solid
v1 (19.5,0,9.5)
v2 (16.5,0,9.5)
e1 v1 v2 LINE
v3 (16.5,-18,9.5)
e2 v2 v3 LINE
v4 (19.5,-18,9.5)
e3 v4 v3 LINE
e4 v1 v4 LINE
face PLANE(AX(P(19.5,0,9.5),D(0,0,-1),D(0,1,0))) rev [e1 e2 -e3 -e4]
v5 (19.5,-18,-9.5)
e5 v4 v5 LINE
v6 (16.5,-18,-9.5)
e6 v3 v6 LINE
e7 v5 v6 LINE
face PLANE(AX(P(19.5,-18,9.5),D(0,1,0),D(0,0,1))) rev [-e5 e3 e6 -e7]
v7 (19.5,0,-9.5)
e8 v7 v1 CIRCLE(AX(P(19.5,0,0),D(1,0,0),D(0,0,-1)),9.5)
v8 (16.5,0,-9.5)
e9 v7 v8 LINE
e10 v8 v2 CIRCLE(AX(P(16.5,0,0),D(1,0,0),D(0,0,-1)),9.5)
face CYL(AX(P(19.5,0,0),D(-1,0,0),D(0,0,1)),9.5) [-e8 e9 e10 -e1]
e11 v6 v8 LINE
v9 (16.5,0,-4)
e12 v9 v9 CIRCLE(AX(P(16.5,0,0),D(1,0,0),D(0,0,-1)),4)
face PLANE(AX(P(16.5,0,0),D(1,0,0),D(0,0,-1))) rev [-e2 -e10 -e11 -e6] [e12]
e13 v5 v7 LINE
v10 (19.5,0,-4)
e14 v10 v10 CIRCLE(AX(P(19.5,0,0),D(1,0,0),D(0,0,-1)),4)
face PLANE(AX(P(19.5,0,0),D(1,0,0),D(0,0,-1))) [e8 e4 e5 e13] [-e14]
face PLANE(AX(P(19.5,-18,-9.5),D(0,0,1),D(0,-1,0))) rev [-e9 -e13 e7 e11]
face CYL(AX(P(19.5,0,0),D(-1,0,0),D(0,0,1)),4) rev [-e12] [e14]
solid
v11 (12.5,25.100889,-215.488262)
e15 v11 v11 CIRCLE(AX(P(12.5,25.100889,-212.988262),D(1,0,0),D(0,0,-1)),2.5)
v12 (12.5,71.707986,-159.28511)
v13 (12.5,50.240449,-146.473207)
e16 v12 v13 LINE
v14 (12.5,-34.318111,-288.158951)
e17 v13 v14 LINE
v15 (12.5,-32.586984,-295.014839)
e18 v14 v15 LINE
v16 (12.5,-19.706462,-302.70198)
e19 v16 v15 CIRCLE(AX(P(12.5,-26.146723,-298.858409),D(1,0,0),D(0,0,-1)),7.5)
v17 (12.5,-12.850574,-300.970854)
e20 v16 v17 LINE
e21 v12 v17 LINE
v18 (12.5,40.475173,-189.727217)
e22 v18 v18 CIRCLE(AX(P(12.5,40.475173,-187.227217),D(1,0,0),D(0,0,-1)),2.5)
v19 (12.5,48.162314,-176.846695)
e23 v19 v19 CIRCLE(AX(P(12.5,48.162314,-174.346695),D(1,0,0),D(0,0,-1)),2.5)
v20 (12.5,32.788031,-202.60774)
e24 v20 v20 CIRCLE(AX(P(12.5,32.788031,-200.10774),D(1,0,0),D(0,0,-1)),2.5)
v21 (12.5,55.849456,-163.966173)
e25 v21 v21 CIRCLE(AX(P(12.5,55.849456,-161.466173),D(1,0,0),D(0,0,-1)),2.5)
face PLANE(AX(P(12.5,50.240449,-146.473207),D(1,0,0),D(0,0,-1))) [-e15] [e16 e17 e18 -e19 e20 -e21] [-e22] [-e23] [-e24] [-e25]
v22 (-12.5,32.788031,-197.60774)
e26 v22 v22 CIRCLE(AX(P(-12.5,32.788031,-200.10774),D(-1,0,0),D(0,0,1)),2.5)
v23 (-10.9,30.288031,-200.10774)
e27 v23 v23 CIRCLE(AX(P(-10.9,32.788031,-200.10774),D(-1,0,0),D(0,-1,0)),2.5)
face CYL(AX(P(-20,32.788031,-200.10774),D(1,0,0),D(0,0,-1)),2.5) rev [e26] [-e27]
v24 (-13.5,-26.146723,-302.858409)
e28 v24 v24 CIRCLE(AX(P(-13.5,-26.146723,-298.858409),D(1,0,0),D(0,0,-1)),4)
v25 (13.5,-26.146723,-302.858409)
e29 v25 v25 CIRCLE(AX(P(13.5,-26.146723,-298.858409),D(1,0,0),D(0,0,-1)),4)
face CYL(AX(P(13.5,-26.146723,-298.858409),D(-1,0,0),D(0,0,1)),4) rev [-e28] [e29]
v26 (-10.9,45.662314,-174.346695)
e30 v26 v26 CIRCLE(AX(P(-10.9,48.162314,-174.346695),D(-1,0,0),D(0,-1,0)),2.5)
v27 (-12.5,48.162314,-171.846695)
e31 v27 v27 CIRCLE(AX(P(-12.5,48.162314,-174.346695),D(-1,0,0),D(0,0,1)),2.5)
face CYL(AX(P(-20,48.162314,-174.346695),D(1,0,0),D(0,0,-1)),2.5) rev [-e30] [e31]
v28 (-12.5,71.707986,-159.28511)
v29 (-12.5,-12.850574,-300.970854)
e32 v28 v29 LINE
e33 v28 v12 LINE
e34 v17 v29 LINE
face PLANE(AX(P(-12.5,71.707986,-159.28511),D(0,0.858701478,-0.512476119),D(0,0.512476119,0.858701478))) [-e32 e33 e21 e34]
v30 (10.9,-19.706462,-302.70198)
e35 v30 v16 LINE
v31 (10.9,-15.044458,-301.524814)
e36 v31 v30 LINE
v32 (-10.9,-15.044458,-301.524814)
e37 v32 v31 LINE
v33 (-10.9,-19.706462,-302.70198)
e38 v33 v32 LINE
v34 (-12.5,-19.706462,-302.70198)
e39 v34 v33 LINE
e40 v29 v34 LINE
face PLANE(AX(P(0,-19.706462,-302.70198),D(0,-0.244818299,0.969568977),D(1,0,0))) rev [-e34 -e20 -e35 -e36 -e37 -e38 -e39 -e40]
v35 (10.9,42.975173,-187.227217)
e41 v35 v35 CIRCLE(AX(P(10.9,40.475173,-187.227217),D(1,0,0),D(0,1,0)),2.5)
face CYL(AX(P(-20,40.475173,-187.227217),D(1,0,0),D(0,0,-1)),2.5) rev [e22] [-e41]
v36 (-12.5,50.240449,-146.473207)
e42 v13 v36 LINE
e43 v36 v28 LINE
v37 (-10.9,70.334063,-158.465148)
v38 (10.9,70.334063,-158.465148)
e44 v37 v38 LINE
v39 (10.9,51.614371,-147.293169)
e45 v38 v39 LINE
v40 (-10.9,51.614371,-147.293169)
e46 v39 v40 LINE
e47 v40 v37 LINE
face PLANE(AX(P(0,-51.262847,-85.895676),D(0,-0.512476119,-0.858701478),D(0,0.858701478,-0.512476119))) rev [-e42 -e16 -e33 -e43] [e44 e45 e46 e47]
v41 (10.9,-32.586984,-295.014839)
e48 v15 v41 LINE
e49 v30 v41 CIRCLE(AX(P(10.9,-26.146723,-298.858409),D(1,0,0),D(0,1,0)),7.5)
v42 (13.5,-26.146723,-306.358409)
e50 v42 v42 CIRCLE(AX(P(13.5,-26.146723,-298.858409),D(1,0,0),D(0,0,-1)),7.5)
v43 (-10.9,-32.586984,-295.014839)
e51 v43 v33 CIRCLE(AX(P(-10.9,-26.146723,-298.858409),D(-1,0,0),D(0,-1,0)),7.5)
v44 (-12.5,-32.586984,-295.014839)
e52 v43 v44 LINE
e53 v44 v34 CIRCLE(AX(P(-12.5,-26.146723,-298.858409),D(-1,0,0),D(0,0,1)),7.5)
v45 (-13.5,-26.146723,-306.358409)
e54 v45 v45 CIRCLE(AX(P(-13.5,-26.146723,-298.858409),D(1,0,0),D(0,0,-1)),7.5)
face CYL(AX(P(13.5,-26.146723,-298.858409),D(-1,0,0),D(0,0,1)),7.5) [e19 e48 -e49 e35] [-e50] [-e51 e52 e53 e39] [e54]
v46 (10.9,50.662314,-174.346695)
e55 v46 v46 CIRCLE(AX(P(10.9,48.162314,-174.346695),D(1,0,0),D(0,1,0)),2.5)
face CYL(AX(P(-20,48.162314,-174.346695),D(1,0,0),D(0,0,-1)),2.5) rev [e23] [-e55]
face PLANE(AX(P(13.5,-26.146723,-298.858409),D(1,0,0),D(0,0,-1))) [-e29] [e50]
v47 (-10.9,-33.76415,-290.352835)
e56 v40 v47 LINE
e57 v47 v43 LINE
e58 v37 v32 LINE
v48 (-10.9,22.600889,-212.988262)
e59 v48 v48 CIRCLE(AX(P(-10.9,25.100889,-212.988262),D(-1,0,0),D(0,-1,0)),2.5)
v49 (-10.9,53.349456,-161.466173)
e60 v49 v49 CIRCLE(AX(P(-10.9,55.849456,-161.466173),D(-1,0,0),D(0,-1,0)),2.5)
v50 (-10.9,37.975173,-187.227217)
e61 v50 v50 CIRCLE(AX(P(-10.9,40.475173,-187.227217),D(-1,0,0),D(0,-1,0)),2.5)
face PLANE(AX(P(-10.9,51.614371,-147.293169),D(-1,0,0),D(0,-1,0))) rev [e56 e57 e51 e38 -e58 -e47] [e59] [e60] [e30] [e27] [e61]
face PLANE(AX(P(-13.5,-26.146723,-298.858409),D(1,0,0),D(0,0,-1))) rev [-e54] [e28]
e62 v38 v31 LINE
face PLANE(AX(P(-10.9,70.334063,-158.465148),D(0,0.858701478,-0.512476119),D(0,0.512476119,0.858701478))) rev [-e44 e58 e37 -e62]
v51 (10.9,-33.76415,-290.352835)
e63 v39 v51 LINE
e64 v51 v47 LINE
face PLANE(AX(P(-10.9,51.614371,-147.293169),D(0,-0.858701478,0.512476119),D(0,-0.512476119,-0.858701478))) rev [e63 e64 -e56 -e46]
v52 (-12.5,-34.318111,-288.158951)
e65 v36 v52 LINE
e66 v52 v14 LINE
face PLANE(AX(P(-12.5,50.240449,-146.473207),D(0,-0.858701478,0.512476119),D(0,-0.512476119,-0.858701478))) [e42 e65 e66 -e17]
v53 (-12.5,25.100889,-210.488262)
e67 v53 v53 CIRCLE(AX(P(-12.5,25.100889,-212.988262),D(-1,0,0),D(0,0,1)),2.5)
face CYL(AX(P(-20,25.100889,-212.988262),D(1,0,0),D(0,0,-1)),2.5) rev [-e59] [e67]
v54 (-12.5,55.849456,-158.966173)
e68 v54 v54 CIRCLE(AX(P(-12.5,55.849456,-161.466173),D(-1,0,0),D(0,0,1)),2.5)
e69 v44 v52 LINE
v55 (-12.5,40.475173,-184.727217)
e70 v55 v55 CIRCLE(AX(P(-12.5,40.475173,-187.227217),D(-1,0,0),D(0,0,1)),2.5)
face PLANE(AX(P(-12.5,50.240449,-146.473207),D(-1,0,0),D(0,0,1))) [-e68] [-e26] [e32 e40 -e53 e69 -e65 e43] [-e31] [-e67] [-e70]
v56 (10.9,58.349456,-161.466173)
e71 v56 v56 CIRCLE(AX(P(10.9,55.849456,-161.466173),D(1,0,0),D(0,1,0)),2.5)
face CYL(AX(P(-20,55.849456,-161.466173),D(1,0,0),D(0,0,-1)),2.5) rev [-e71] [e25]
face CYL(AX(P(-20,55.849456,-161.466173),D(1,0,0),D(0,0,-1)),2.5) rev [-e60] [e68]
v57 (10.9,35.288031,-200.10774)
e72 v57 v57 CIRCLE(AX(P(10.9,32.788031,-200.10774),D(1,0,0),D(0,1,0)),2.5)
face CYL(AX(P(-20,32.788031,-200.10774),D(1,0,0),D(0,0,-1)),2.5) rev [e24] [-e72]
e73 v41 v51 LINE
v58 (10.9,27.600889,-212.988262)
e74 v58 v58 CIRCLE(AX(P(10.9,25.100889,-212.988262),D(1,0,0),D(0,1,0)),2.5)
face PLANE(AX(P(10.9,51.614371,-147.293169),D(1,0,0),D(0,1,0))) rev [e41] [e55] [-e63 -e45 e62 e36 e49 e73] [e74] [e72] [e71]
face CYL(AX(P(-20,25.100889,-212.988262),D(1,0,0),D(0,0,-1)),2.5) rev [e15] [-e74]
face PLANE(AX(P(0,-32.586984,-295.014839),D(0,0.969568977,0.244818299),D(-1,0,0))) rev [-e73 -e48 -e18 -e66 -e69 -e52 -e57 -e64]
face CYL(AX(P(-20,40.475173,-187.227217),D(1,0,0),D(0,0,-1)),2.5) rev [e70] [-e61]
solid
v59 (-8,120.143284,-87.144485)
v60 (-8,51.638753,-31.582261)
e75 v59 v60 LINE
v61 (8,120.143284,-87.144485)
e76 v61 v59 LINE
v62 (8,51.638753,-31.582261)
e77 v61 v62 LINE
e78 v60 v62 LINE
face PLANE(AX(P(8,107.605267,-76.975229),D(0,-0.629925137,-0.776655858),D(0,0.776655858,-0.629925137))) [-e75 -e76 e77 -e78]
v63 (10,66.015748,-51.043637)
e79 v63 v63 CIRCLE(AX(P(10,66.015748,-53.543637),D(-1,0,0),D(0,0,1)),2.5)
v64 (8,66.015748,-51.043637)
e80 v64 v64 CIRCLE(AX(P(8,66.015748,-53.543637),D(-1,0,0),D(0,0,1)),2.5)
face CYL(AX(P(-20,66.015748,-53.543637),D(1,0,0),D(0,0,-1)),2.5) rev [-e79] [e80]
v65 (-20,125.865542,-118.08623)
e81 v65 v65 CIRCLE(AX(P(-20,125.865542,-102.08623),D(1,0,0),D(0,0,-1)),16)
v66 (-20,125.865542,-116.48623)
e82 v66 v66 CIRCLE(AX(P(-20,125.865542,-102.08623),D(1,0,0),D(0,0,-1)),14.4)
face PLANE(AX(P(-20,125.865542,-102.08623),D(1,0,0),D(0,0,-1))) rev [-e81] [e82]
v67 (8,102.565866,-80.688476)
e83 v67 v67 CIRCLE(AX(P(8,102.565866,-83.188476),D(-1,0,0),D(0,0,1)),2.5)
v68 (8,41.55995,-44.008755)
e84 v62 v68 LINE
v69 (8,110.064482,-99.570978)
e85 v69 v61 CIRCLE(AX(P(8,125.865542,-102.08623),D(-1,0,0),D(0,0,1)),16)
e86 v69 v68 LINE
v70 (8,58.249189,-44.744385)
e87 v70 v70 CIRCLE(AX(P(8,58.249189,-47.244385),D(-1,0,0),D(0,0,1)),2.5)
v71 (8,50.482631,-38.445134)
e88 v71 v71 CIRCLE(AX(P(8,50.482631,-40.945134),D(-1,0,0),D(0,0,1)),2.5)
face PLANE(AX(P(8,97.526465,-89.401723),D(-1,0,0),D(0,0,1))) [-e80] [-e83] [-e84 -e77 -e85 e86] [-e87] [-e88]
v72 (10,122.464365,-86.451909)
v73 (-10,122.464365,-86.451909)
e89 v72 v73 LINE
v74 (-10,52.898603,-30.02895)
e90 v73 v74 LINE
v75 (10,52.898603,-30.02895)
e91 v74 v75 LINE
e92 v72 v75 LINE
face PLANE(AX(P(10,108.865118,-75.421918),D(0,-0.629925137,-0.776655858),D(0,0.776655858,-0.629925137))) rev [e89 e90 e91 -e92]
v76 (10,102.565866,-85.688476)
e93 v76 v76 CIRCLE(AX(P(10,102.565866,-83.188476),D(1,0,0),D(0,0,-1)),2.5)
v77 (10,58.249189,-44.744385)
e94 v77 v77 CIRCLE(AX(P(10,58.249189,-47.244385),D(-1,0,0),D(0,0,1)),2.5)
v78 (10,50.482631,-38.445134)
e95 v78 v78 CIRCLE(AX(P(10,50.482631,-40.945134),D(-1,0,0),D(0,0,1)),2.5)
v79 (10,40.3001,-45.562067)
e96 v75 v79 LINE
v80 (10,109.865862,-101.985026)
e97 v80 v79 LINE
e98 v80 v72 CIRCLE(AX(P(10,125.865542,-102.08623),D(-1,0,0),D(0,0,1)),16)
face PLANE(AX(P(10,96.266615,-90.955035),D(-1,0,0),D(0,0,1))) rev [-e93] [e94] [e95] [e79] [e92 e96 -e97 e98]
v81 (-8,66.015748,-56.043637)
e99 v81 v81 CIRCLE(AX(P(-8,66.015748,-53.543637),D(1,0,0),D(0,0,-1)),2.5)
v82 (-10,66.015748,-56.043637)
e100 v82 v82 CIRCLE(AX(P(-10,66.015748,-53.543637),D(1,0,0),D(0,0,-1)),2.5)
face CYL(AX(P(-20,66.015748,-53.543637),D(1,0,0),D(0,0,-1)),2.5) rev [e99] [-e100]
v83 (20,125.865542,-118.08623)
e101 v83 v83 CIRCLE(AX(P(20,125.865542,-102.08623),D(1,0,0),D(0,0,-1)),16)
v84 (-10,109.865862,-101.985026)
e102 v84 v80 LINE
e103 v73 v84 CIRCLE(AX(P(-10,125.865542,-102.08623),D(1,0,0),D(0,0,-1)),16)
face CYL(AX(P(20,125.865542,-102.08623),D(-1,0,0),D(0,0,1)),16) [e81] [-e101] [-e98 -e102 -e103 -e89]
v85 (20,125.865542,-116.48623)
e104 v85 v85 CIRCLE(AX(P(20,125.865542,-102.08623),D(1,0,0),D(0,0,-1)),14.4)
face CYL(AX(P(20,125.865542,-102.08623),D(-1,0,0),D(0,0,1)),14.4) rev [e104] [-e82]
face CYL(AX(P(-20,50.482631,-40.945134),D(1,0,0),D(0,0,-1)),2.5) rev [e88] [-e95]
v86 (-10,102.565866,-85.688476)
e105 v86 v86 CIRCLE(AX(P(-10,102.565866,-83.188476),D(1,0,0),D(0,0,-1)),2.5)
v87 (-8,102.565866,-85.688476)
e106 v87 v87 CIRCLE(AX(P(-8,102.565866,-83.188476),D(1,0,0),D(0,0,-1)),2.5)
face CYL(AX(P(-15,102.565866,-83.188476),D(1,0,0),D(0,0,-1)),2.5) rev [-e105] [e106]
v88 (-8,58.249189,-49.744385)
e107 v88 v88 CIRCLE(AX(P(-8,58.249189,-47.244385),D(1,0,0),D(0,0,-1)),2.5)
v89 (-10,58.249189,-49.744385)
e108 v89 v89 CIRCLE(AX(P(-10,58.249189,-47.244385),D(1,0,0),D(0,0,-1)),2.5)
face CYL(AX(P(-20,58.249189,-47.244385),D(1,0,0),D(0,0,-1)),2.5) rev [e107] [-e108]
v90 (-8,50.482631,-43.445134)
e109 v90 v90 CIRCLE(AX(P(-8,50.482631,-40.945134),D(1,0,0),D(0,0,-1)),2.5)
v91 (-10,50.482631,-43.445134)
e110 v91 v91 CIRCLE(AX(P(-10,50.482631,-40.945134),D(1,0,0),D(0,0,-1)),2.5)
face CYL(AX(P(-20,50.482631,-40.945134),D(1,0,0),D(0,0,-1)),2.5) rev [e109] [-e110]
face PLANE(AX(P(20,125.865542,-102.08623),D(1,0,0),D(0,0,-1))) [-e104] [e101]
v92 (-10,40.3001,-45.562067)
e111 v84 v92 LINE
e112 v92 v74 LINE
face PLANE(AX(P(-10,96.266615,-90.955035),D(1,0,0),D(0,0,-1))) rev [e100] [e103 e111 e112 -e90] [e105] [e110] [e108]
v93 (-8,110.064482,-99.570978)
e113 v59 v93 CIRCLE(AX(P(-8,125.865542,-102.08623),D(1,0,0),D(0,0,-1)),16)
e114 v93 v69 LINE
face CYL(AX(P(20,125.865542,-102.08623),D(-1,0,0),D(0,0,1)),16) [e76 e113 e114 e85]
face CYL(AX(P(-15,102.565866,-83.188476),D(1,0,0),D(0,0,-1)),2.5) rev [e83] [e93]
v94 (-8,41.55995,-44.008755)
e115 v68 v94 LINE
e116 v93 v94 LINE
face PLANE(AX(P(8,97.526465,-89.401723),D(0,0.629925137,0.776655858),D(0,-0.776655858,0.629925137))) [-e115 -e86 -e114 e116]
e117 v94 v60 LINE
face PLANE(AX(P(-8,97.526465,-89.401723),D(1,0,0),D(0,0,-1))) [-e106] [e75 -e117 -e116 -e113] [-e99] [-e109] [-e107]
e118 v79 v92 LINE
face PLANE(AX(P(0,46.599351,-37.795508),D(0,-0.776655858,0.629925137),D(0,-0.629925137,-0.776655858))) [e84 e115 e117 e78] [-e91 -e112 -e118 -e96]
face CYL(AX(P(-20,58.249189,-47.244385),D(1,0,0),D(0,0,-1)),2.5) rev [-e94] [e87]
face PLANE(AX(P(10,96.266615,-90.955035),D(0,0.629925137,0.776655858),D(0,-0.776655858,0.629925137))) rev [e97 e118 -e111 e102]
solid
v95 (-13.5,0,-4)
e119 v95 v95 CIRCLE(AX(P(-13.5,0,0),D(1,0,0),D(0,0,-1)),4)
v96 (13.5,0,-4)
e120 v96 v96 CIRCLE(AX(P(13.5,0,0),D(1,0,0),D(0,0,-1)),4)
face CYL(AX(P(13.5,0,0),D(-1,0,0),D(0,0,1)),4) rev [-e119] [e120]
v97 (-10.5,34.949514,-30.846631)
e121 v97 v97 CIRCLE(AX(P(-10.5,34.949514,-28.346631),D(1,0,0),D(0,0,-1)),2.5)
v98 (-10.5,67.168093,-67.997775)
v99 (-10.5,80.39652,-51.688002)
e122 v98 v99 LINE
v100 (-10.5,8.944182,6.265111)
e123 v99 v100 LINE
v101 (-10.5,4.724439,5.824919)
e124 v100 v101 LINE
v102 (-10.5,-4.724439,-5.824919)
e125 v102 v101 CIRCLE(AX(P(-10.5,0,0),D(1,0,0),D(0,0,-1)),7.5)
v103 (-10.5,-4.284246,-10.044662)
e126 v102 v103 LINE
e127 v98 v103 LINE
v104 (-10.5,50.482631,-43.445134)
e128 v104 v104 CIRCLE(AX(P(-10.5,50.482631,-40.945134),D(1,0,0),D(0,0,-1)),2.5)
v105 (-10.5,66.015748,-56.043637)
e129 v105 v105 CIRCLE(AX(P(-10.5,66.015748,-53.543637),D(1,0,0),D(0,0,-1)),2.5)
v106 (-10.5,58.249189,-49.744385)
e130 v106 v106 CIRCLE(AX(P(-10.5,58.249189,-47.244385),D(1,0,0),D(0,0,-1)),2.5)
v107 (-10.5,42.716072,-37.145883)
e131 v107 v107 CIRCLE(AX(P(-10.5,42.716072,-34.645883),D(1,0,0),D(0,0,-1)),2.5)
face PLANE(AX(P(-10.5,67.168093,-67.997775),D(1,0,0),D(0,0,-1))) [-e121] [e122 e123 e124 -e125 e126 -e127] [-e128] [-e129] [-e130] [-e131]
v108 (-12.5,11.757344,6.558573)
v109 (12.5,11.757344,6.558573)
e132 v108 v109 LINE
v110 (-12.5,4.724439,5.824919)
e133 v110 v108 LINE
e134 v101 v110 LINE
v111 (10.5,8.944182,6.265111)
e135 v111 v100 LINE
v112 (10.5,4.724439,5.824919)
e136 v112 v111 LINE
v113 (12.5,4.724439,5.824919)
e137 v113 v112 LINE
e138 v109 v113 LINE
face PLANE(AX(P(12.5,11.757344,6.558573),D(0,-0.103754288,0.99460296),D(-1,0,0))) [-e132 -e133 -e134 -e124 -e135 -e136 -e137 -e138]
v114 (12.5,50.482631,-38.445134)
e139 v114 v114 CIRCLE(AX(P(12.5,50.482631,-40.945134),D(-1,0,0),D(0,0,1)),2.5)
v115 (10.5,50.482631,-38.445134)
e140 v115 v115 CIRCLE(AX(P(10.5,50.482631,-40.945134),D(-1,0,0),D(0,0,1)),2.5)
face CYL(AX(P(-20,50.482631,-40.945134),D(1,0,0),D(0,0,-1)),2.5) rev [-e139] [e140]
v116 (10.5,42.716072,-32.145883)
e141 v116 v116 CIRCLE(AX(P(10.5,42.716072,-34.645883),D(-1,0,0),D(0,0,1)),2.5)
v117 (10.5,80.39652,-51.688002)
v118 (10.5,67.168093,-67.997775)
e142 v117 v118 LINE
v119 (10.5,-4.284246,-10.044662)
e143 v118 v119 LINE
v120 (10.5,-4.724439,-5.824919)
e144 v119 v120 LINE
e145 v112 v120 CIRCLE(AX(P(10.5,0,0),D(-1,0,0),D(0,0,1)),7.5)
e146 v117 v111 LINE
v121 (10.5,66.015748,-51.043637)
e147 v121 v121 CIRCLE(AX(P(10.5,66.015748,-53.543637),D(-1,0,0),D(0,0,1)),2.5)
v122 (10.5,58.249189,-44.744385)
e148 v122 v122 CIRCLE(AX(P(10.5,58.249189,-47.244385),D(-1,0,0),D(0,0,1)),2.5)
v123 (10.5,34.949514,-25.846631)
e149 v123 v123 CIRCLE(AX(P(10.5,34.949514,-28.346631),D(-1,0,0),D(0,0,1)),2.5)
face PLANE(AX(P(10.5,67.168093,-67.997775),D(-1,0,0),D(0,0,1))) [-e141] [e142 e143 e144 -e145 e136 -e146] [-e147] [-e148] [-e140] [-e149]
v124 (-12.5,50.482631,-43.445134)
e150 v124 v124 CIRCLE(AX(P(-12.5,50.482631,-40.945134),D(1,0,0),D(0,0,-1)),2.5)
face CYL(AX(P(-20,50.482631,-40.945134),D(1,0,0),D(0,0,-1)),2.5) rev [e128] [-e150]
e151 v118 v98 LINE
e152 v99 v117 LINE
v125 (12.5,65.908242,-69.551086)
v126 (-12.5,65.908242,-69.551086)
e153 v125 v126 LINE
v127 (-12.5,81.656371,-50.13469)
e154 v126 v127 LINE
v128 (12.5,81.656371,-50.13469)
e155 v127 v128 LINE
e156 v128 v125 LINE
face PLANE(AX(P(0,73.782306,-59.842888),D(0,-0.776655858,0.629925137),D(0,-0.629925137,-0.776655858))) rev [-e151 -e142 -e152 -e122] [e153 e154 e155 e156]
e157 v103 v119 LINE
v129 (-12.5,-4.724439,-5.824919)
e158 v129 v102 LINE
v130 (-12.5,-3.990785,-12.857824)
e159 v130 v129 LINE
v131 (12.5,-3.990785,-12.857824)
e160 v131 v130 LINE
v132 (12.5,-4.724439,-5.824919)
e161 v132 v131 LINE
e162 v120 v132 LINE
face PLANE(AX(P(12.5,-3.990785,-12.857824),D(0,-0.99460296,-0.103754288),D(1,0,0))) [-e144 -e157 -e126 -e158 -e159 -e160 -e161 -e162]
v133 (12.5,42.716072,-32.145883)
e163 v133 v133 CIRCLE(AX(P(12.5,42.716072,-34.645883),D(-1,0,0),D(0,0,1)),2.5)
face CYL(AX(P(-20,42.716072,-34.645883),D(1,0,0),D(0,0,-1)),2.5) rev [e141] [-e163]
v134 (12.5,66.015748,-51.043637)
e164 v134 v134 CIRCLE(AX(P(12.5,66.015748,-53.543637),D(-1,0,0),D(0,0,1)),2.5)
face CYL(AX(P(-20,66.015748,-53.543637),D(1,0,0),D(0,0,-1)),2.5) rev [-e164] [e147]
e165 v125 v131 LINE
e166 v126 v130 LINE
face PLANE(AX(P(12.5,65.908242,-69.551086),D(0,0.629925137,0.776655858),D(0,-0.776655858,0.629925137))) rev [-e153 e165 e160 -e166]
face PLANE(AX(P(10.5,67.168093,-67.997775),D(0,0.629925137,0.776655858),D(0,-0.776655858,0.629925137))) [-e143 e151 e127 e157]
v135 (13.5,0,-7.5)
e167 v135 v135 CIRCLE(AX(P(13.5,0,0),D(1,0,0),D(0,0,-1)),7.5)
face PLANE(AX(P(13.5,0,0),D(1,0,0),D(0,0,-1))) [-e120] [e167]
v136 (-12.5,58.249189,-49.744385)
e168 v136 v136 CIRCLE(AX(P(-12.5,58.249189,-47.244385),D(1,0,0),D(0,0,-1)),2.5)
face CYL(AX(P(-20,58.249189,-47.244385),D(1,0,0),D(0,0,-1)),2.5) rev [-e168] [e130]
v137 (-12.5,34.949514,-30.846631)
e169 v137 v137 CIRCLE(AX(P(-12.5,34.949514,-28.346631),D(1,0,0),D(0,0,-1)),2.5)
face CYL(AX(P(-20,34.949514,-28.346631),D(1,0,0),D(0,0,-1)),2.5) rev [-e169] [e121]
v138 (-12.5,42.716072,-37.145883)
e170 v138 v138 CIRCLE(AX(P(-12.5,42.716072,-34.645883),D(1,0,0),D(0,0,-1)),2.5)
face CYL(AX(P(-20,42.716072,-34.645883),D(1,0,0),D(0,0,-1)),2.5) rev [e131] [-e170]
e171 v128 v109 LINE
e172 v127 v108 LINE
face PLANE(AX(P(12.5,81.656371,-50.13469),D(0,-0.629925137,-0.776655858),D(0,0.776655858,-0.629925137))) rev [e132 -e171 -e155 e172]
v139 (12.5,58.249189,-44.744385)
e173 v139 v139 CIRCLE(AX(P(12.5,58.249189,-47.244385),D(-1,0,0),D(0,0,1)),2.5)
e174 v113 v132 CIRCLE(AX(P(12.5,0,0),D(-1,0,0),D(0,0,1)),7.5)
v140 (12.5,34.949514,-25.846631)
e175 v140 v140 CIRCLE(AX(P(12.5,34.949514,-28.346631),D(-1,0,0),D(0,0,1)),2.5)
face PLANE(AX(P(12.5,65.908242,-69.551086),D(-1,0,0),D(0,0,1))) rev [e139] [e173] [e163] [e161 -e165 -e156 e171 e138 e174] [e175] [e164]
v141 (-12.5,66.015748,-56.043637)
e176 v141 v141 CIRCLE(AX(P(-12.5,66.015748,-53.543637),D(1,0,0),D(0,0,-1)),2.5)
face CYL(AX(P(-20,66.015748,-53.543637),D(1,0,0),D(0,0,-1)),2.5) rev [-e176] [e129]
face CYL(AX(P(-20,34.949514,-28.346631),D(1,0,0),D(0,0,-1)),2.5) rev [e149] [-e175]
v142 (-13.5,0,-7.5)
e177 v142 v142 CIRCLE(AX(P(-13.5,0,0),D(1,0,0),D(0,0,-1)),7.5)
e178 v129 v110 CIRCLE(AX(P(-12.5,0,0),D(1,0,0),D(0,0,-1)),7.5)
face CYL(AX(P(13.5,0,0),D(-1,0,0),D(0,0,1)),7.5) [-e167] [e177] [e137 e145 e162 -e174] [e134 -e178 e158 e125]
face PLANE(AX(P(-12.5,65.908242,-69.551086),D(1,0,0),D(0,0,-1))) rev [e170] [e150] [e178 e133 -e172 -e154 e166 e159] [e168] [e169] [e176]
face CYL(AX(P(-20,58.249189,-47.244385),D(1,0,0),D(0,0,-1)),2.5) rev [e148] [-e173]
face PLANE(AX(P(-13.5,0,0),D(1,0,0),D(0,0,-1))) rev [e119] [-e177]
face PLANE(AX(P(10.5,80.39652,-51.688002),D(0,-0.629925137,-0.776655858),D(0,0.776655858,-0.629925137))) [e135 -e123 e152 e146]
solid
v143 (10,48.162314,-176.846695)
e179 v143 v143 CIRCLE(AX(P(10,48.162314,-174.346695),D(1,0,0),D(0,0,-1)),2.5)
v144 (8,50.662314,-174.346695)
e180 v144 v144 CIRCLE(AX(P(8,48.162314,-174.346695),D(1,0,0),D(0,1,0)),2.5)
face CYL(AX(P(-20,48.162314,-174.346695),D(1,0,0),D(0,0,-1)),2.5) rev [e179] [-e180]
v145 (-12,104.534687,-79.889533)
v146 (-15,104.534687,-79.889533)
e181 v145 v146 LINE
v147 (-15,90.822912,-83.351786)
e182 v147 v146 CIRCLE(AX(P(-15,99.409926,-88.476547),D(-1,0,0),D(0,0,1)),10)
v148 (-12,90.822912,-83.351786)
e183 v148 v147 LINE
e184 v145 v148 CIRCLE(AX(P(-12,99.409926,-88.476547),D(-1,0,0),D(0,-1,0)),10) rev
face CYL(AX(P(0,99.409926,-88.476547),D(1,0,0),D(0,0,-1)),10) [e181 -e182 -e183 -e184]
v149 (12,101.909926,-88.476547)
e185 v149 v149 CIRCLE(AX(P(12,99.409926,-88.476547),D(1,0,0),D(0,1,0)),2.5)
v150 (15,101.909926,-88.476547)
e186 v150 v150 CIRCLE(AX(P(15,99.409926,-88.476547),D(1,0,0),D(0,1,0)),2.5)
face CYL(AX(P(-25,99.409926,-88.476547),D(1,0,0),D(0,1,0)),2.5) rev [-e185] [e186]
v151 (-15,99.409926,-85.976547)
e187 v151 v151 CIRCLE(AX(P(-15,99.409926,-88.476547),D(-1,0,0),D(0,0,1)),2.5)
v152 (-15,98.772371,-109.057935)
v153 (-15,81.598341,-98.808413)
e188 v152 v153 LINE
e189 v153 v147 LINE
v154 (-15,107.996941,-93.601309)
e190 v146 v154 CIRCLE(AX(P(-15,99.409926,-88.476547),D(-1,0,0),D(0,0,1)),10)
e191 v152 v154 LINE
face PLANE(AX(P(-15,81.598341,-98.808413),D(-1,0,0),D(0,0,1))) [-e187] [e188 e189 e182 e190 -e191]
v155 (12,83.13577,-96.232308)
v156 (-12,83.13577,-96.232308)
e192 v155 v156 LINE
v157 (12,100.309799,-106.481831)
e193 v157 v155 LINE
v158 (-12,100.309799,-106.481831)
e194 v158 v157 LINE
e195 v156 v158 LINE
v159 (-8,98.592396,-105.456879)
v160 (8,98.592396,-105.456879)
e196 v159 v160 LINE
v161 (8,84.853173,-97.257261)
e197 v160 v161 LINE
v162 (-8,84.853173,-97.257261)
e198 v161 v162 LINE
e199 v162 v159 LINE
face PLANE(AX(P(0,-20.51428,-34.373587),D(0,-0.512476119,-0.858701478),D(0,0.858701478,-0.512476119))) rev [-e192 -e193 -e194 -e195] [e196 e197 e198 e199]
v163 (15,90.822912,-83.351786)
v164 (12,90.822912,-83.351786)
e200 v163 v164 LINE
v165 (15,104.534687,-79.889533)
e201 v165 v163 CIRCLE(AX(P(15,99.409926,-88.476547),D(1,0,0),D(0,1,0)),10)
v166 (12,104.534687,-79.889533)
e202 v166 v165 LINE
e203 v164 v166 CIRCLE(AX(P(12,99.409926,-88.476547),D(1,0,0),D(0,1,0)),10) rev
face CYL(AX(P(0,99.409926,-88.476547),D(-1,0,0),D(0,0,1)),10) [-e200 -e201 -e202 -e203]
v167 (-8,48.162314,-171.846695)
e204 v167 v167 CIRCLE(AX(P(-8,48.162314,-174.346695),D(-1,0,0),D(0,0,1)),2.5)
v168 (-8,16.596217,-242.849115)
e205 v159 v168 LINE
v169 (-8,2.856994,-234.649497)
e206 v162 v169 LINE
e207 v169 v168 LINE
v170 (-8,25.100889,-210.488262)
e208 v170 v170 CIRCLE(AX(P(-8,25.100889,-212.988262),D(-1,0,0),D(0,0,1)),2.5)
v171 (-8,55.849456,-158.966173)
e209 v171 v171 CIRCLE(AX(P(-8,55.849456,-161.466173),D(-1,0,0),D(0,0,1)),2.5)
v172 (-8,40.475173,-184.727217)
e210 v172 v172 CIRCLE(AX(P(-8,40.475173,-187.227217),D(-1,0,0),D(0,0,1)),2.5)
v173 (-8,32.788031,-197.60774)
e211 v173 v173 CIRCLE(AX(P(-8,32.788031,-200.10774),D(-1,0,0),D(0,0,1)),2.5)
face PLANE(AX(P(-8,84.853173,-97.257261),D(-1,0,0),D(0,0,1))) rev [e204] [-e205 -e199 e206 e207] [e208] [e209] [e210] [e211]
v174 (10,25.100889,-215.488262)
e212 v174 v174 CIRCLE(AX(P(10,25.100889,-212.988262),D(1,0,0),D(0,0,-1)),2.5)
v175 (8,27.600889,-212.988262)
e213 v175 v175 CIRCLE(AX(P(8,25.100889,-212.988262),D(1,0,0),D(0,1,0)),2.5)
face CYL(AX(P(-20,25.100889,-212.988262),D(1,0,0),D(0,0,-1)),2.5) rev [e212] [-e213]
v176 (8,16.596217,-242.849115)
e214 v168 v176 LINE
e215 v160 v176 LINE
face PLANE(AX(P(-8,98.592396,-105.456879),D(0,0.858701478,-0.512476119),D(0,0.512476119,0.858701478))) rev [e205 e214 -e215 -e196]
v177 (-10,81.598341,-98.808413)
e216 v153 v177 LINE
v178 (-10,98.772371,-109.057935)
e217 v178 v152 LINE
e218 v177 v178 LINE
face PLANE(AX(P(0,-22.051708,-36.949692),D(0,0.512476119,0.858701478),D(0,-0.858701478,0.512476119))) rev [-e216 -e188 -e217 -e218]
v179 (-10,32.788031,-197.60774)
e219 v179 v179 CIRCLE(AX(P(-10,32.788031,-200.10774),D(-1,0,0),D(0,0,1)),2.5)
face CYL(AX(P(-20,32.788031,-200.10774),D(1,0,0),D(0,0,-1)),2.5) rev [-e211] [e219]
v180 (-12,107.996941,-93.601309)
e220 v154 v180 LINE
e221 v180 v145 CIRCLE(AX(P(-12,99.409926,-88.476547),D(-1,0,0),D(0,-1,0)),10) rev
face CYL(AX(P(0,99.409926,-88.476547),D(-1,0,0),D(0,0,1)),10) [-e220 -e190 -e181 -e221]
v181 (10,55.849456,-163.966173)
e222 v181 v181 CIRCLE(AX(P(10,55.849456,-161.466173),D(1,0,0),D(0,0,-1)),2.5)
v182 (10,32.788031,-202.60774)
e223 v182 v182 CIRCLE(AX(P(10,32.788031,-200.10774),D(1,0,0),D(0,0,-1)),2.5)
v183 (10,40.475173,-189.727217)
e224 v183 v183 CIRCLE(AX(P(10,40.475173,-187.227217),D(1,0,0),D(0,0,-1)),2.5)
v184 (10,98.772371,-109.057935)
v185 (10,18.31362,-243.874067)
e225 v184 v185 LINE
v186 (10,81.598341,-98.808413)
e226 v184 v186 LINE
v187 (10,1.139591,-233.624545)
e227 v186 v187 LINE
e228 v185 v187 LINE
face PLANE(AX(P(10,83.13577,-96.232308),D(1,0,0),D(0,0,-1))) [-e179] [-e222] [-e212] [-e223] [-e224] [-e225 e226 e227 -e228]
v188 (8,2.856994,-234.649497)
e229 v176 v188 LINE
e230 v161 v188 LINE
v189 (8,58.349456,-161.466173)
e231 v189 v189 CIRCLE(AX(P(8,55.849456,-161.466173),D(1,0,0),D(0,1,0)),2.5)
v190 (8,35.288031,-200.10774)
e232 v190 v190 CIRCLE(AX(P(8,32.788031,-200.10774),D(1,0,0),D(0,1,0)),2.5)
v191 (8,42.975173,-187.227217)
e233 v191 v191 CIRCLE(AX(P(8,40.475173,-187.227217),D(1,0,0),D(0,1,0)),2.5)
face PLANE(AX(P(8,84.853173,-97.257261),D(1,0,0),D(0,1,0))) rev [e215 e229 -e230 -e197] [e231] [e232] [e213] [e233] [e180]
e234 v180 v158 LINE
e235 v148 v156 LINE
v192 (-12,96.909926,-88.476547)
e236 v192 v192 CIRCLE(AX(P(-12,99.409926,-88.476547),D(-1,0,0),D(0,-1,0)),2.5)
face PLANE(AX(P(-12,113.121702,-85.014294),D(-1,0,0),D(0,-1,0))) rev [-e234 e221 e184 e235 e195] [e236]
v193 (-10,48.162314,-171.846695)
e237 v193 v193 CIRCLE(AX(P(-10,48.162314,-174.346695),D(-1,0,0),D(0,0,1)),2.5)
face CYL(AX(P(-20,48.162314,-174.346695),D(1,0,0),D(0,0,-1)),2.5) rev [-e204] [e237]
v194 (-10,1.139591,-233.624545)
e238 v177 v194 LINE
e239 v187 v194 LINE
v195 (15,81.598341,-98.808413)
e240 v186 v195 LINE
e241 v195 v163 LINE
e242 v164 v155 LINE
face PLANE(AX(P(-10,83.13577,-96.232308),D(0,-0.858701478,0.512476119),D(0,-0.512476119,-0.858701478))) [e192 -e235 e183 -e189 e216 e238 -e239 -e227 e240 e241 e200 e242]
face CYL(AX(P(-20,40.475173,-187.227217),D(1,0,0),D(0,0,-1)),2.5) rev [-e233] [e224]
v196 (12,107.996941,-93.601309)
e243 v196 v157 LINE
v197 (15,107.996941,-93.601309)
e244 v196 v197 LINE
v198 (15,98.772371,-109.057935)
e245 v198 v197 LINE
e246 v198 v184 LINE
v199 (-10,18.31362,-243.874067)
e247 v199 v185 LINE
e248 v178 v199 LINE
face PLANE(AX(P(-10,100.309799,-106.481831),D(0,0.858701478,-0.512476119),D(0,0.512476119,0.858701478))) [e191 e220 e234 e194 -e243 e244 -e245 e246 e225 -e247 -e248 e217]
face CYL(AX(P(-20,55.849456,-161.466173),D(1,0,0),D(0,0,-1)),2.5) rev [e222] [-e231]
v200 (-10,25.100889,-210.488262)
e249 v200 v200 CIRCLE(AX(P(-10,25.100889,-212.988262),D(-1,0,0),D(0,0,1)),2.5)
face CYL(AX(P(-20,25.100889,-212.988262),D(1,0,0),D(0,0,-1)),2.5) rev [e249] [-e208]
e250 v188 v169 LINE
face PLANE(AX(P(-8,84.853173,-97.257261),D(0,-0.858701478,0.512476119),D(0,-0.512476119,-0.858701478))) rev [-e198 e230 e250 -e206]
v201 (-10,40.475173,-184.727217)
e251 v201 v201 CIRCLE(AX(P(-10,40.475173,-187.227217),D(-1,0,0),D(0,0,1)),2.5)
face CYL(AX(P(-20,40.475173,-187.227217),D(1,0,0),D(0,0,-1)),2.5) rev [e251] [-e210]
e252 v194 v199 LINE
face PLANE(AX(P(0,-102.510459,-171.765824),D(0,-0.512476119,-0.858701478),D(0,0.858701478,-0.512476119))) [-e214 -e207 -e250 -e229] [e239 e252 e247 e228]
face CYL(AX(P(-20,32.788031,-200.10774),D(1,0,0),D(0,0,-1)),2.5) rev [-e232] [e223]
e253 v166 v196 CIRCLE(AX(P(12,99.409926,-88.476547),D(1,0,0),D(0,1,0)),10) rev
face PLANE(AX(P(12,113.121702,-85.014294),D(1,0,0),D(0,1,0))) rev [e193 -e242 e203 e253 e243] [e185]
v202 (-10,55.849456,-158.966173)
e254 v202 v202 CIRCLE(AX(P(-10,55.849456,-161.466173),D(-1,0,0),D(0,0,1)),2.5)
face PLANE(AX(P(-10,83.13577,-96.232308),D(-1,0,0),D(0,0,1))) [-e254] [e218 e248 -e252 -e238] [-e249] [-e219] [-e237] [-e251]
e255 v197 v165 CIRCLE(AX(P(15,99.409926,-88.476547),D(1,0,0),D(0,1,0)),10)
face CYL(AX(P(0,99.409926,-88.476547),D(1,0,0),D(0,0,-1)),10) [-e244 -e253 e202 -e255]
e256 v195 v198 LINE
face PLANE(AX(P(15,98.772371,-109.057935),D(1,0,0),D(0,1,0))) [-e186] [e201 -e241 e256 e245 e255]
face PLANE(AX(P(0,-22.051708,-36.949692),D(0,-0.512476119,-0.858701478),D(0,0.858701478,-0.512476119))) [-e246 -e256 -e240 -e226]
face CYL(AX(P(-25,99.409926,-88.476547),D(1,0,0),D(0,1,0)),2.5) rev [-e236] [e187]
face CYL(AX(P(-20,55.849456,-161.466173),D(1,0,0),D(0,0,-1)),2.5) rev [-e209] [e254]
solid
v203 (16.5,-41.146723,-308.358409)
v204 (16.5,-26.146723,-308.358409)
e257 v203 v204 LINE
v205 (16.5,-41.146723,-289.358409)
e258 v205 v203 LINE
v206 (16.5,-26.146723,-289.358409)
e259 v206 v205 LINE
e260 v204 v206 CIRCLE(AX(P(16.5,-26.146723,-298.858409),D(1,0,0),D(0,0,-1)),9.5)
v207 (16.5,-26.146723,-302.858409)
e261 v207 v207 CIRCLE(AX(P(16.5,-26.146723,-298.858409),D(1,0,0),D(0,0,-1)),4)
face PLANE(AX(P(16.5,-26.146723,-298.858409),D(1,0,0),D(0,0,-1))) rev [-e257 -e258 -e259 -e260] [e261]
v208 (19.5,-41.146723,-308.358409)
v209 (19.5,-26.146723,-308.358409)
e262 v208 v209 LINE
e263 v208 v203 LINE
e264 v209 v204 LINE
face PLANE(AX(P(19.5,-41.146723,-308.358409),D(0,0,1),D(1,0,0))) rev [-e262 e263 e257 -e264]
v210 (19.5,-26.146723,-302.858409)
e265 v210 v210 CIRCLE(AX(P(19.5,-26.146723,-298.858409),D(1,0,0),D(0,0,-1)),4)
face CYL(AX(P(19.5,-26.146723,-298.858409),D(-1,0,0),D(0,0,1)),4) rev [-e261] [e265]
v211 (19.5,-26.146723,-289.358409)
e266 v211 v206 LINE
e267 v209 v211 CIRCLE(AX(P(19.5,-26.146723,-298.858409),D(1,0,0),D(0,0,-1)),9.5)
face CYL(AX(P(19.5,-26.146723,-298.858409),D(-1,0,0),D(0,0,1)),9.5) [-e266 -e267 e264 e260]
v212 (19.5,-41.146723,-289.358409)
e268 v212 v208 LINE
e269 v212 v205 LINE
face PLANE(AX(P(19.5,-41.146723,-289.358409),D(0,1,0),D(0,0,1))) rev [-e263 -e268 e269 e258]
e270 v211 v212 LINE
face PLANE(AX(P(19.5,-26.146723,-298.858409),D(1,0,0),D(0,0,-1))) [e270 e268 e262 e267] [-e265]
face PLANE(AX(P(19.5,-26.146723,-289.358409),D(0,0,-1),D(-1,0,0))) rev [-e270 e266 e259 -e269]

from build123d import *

# Parameters (mm, degrees)
SKETCH4_W              = 25
SKETCH4_H              = 25
SKETCH4_W_2            = 21
SKETCH4_H_2            = 21
BOSS_EXTRUDE3_DEPTH    = 95
SKETCH9_W              = 25
SKETCH9_H              = 25
SKETCH9_W_2            = 21.8
SKETCH9_H_2            = 21.8
BOSS_EXTRUDE6_DEPTH    = 170
SKETCH7_R              = 7.5
CUT_EXTRUDE2_DEPTH     = 85
SKETCH2_R              = 7.5
SKETCH2_R_2            = 4
BOSS_EXTRUDE2_DEPTH    = 13.5
BOSS_EXTRUDE4_START    = 60
SKETCH5_W              = 20
SKETCH5_H              = 20
SKETCH5_W_2            = 16
SKETCH5_H_2            = 16
BOSS_EXTRUDE4_DEPTH    = 72.060893
BOSS_EXTRUDE7_START    = -70
SKETCH10_W             = 20
SKETCH10_H             = 20
SKETCH10_W_2           = 16
SKETCH10_H_2           = 16
BOSS_EXTRUDE7_DEPTH    = 160
SKETCH17_W             = 20
SKETCH17_H             = 20
SKETCH17_W_2           = 16
SKETCH17_H_2           = 16
BOSS_EXTRUDE11_DEPTH   = 30
SKETCH11_R             = 16
CUT_EXTRUDE3_DEPTH     = 12.5
SKETCH12_R             = 16
SKETCH12_R_2           = 14.4
BOSS_EXTRUDE8_DEPTH    = 20
CHAMFER1_SIZE          = 5
CHAMFER2_SIZE          = 5
SKETCH13_R             = 2.5
CUT_EXTRUDE4_DEPTH     = 20
SKETCH15_R             = 2.5
CUT_EXTRUDE5_DEPTH     = 20
LPATTERN1_COUNT        = 5
LPATTERN1_PITCH        = 10
LPATTERN2_COUNT        = 5
LPATTERN2_PITCH        = 15
BOSS_EXTRUDE10_START   = 18
SKETCH16_R             = 4
BOSS_EXTRUDE10_DEPTH   = 1.5
BOSS_EXTRUDE10_2_DEPTH = 1.5
SKETCH18_W             = 5
SKETCH18_H             = 20
BOSS_EXTRUDE12_DEPTH   = 3
SKETCH19_W             = 3
SKETCH19_H             = 20
BOSS_EXTRUDE13_DEPTH   = 25
FILLET1_R              = 10
SKETCH20_R             = 2.5
CUT_EXTRUDE6_DEPTH     = 25
SKETCH21_R             = 2.5
CUT_EXTRUDE7_DEPTH     = 40


# Some blends are built 0.0001 mm under size
with BuildPart() as part:
    # Sketch4 → Boss-Extrude3 (new body)
    with BuildSketch(Plane(origin=(0, 0, 0), x_dir=(-1, 0, 0), z_dir=(0, 0.776655857872885, -0.629925137164515))):
        Rectangle(SKETCH4_W, SKETCH4_H)
        Rectangle(SKETCH4_W_2, SKETCH4_H_2, mode=Mode.SUBTRACT)
    extrude(amount=BOSS_EXTRUDE3_DEPTH)


with BuildPart() as body_2:
    # Sketch9 → Boss-Extrude6 (new body)
    with BuildSketch(Plane(origin=(0, -26.146722824, -298.858409428), x_dir=(-1, 0, 0), z_dir=(0, -0.5124761188021193, -0.858701477614611))):
        Rectangle(SKETCH9_W, SKETCH9_H)
        Rectangle(SKETCH9_W_2, SKETCH9_H_2, mode=Mode.SUBTRACT)
    extrude(amount=-BOSS_EXTRUDE6_DEPTH)


with BuildPart() as cut_extrude2_tool:
    # Sketch7 → Cut-Extrude2 (new, symmetric)
    with BuildSketch(Plane(origin=(0, 0, 0), x_dir=(0, 0, -1), z_dir=(1, 0, 0))):
        Circle(SKETCH7_R)
        with Locations((298.858409428, -26.146722824)):
            Circle(SKETCH7_R)
    extrude(amount=CUT_EXTRUDE2_DEPTH, both=True)


with BuildPart() as part_1:
    add(part.part)

    # Cut-Extrude2: cut by cut_extrude2_tool
    add(cut_extrude2_tool.part, mode=Mode.SUBTRACT)



with BuildPart() as body_2_1:
    add(body_2.part)

    # Cut-Extrude2: cut by cut_extrude2_tool
    add(cut_extrude2_tool.part, mode=Mode.SUBTRACT)


with BuildPart() as part_2:
    add(part_1.part)

    add(body_2_1.part)  # Boss-Extrude2 merges body 2
    # Sketch2 → Boss-Extrude2 (add, symmetric)
    # profile 1 of 2: a face of its own
    with BuildSketch(Plane(origin=(0, 0, 0), x_dir=(0, 0, -1), z_dir=(1, 0, 0))):
        Circle(SKETCH2_R)
        Circle(SKETCH2_R_2, mode=Mode.SUBTRACT)
    # profile 2 of 2: a face of its own
    with BuildSketch(Plane(origin=(0, 0, 0), x_dir=(0, 0, -1), z_dir=(1, 0, 0))):
        with Locations((298.858409428, -26.146722824)):
            Circle(SKETCH2_R)
        with Locations((298.858409428, -26.146722824)):
            Circle(SKETCH2_R_2, mode=Mode.SUBTRACT)
    extrude(amount=BOSS_EXTRUDE2_DEPTH, both=True)

    # Chamfer1
    # the kernel refuses this chamfer: 5 mm, written as the material it takes off along each edge
    with BuildSketch(Plane(origin=(25.35841494, -7.874064215, -9.708198223), x_dir=(0, 0.7590418735818988, -0.6510418067599658), z_dir=(-1, 0, 0))) as chamfer1_piece_1_section:
        Polygon((CHAMFER1_SIZE * 0.999621916911, -CHAMFER1_SIZE * 0.0274958766106), (-CHAMFER1_SIZE * 0.0274958766106, -CHAMFER1_SIZE * 0.999621916911), (0, 0), align=None)
    chamfer1_piece_1 = extrude(amount=50.71682988, mode=Mode.PRIVATE)
    chamfer1_piece_1 = chamfer1_piece_1 - Plane(origin=(0, 0, 0), x_dir=(0, 0, -1), z_dir=(1, 0, 0)) * Cylinder(7.5, 122, mode=Mode.PRIVATE)
    add(chamfer1_piece_1, mode=Mode.SUBTRACT)
    with BuildSketch(Plane(origin=(-25.35841494, 7.874064215, 9.708198223), x_dir=(0, -0.651041806759966, -0.7590418735818988), z_dir=(1, 0, 0))) as chamfer1_piece_2_section:
        Polygon((CHAMFER1_SIZE * 0.999621916911, CHAMFER1_SIZE * 0.0274958766106), (-CHAMFER1_SIZE * 0.0274958766106, CHAMFER1_SIZE * 0.999621916911), (0, 0), align=None)
    chamfer1_piece_2 = extrude(amount=50.71682988, mode=Mode.PRIVATE)
    chamfer1_piece_2 = chamfer1_piece_2 - Plane(origin=(0, 0, 0), x_dir=(0, 0, -1), z_dir=(1, 0, 0)) * Cylinder(7.5, 122, mode=Mode.PRIVATE)
    add(chamfer1_piece_2, mode=Mode.SUBTRACT)

    # Chamfer2
    # the kernel refuses this chamfer: 5 mm, written as the material it takes off along each edge
    with BuildSketch(Plane(origin=(25.35841494, -15.412954354, -305.264360913), x_dir=(0, 0.5358931101220563, 0.8442858369792244), z_dir=(-1, 0, 0))) as chamfer2_piece_1_section:
        Polygon((CHAMFER2_SIZE * 0.999621916911, -CHAMFER2_SIZE * 0.0274958766106), (-CHAMFER2_SIZE * 0.0274958766106, -CHAMFER2_SIZE * 0.999621916911), (0, 0), align=None)
    chamfer2_piece_1 = extrude(amount=50.71682988, mode=Mode.PRIVATE)
    chamfer2_piece_1 = chamfer2_piece_1 - Plane(origin=(0, -26.146722824, -298.858409428), x_dir=(0, 0, -1), z_dir=(1, 0, 0)) * Cylinder(7.5, 122, mode=Mode.PRIVATE)
    add(chamfer2_piece_1, mode=Mode.SUBTRACT)
    with BuildSketch(Plane(origin=(-25.35841494, -36.880491294, -292.452457942), x_dir=(0, 0.4886716103744133, 0.8724677972361372), z_dir=(1, 0, 0))) as chamfer2_piece_2_section:
        Polygon((CHAMFER2_SIZE * 0.999621916911, -CHAMFER2_SIZE * 0.0274958766106), (-CHAMFER2_SIZE * 0.0274958766106, -CHAMFER2_SIZE * 0.999621916911), (0, 0), align=None)
    chamfer2_piece_2 = extrude(amount=50.71682988, mode=Mode.PRIVATE)
    chamfer2_piece_2 = chamfer2_piece_2 - Plane(origin=(0, -26.146722824, -298.858409428), x_dir=(0, 0, -1), z_dir=(1, 0, 0)) * Cylinder(7.5, 122, mode=Mode.PRIVATE)
    add(chamfer2_piece_2, mode=Mode.SUBTRACT)


with BuildPart() as body_2_2:
    # Sketch5 → Boss-Extrude4 (new body)
    with BuildSketch(Plane(origin=(0, 0, 0), x_dir=(-1, 0, 0), z_dir=(0, 0.776655857872885, -0.629925137164515)).offset(BOSS_EXTRUDE4_START)):
        Rectangle(SKETCH5_W, SKETCH5_H)
        Rectangle(SKETCH5_W_2, SKETCH5_H_2, mode=Mode.SUBTRACT)
    extrude(amount=BOSS_EXTRUDE4_DEPTH)

    # Sketch17 → Boss-Extrude11 (add)
    with BuildSketch(Plane(origin=(0, 102.56586616, -83.18847615), x_dir=(1, 0, 0), z_dir=(0, 0.7766558578728849, -0.6299251371645154))):
        Rectangle(SKETCH17_W, SKETCH17_H)
        Rectangle(SKETCH17_W_2, SKETCH17_H_2, mode=Mode.SUBTRACT)
    extrude(amount=BOSS_EXTRUDE11_DEPTH)

    # Sketch11 → Cut-Extrude3 (cut, symmetric)
    with BuildSketch(Plane(origin=(0, 0, 0), x_dir=(0, 0, -1), z_dir=(1, 0, 0))):
        with Locations((102.086230265, 125.865541896)):
            Circle(SKETCH11_R)
    extrude(amount=CUT_EXTRUDE3_DEPTH, both=True, mode=Mode.SUBTRACT)

    # Sketch12 → Boss-Extrude8 (add, symmetric)
    with BuildSketch(Plane(origin=(0, 0, 0), x_dir=(0, 0, -1), z_dir=(1, 0, 0))):
        with Locations((102.086230265, 125.865541896)):
            Circle(SKETCH12_R)
        with Locations((102.086230265, 125.865541896)):
            Circle(SKETCH12_R_2, mode=Mode.SUBTRACT)
    extrude(amount=BOSS_EXTRUDE8_DEPTH, both=True)


with BuildPart() as body_3:
    # Sketch10 → Boss-Extrude7 (new body)
    with BuildSketch(Plane(origin=(0, -26.146722824, -298.858409428), x_dir=(-1, 0, 0), z_dir=(0, -0.5124761188021193, -0.858701477614611)).offset(BOSS_EXTRUDE7_START)):
        Rectangle(SKETCH10_W, SKETCH10_H)
        Rectangle(SKETCH10_W_2, SKETCH10_H_2, mode=Mode.SUBTRACT)
    extrude(amount=-BOSS_EXTRUDE7_DEPTH)


with BuildPart() as cut_extrude4_tool:
    # Sketch13 → Cut-Extrude4 (new, symmetric)
    with BuildSketch(Plane(origin=(0, 0, 0), x_dir=(0, 0, -1), z_dir=(1, 0, 0))):
        with Locations(Location((53.543636659, 66.015747919, 0), (0, 0, 180))):
            Circle(SKETCH13_R)
    cut_extrude4 = extrude(amount=CUT_EXTRUDE4_DEPTH, both=True)


with BuildPart() as part_3:
    add(part_2.part)

    # Cut-Extrude4: cut by cut_extrude4_tool
    add(cut_extrude4_tool.part, mode=Mode.SUBTRACT)


with BuildPart() as body_2_2_1:
    add(body_2_2.part)

    # Cut-Extrude4: cut by cut_extrude4_tool
    add(cut_extrude4_tool.part, mode=Mode.SUBTRACT)


with BuildPart() as cut_extrude5_tool:
    # Sketch15 → Cut-Extrude5 (new, symmetric)
    with BuildSketch(Plane(origin=(0, 0, 0), x_dir=(0, 0, -1), z_dir=(1, 0, 0))):
        with Locations(Location((161.466173009, 55.849456184, 0), (0, 0, 180))):
            Circle(SKETCH15_R)
    cut_extrude5 = extrude(amount=CUT_EXTRUDE5_DEPTH, both=True)


with BuildPart() as part_4:
    add(part_3.part)

    # Cut-Extrude5: cut by cut_extrude5_tool
    add(cut_extrude5_tool.part, mode=Mode.SUBTRACT)


with BuildPart() as body_3_1:
    add(body_3.part)

    # Cut-Extrude5: cut by cut_extrude5_tool
    add(cut_extrude5_tool.part, mode=Mode.SUBTRACT)


with BuildPart() as lpattern1_tool:
    # LPattern1: Cut-Extrude4 ×5
    with Locations(*[Vector(0, -0.7766558578728853, 0.6299251371645148) * (i * LPATTERN1_PITCH) for i in range(1, LPATTERN1_COUNT)]):
        add(cut_extrude4)


with BuildPart() as part_5:
    add(part_4.part)

    # LPattern1: cut by lpattern1_tool
    add(lpattern1_tool.part, mode=Mode.SUBTRACT)


with BuildPart() as body_2_2_2:
    add(body_2_2_1.part)

    # LPattern1: cut by lpattern1_tool
    add(lpattern1_tool.part, mode=Mode.SUBTRACT)

    # Sketch20 → Cut-Extrude6 (cut)
    with BuildSketch(Plane(origin=(10, 0, 0), x_dir=(0, 0, -1), z_dir=(1, 0, 0))):
        with Locations((83.18847615, 102.56586616)):
            Circle(SKETCH20_R)
    extrude(amount=-CUT_EXTRUDE6_DEPTH, mode=Mode.SUBTRACT)


with BuildPart() as lpattern2_tool:
    # LPattern2: Cut-Extrude5 ×5
    with Locations(*[Vector(0, -0.5124761188021193, -0.8587014776146109) * (i * LPATTERN2_PITCH) for i in range(1, LPATTERN2_COUNT)]):
        add(cut_extrude5)


with BuildPart() as part_6:
    add(part_5.part)

    # LPattern2: cut by lpattern2_tool
    add(lpattern2_tool.part, mode=Mode.SUBTRACT)


with BuildPart() as body_3_2:
    add(body_3_1.part)

    # LPattern2: cut by lpattern2_tool
    add(lpattern2_tool.part, mode=Mode.SUBTRACT)

    # Sketch18 → Boss-Extrude12 (add)
    with BuildSketch(Plane(origin=(0, -20.514280055, -34.373587274), x_dir=(1, 0, 0), z_dir=(0, 0.5124761188021189, 0.8587014776146111))):
        with Locations((-12.5, 130.705568211)):
            Rectangle(SKETCH18_W, SKETCH18_H)
        with Locations((12.5, 130.705568211)):
            Rectangle(SKETCH18_W, SKETCH18_H)
    extrude(amount=-BOSS_EXTRUDE12_DEPTH)

    # Sketch19 → Boss-Extrude13 (add)
    with BuildSketch(Plane(origin=(0, -20.514280055, -34.373587274), x_dir=(1, 0, 0), z_dir=(0, 0.5124761188021189, 0.8587014776146111))):
        with Locations((-13.5, 130.705568211)):
            Rectangle(SKETCH19_W, SKETCH19_H)
        with Locations((13.5, 130.705568211)):
            Rectangle(SKETCH19_W, SKETCH19_H)
    extrude(amount=BOSS_EXTRUDE13_DEPTH)

    # Fillet1
    fillet1_edges = [body_3_2.edges().sort_by_distance(p)[0] for p in [
        (-13.5, 95.947672694, -74.764771448),
        (-13.5, 113.121702246, -85.014293824),
        (13.5, 113.121702246, -85.014293824),
        (13.5, 95.947672694, -74.764771448),
    ]]
    fillet(fillet1_edges, radius=FILLET1_R - 0.0001)  # a hair under: the kernel refuses the full size

    # Sketch21 → Cut-Extrude7 (cut)
    with BuildSketch(Plane(origin=(15, 0, 0), x_dir=(0, 0, -1), z_dir=(1, 0, 0))):
        with Locations(Location((88.476547412, 99.409926282, 0), (0, 0, 90))):
            Circle(SKETCH21_R)
    extrude(amount=-CUT_EXTRUDE7_DEPTH, mode=Mode.SUBTRACT)


with BuildPart() as body_4:
    # Sketch16 → Boss-Extrude10 (new, symmetric)
    with BuildSketch(Plane(origin=(0, 0, 0), x_dir=(0, 0, -1), z_dir=(1, 0, 0)).offset(BOSS_EXTRUDE10_START)):
        with BuildLine():
            Line((-9.5, 0), (-9.5, -18))
            Line((-9.5, -18), (9.5, -18))
            Line((9.5, -18), (9.5, 0))
            ThreePointArc((9.5, 0), (0, 9.5), (-9.5, 0))
        make_face()
        Circle(SKETCH16_R, mode=Mode.SUBTRACT)
    extrude(amount=BOSS_EXTRUDE10_DEPTH, both=True)


with BuildPart() as body_5:
    # Sketch16 → Boss-Extrude10 2 (new, symmetric)
    with BuildSketch(Plane(origin=(0, 0, 0), x_dir=(0, 0, -1), z_dir=(1, 0, 0)).offset(BOSS_EXTRUDE10_START)):
        with BuildLine():
            Line((289.358409428, -26.146722824), (289.358409428, -41.146722824))
            Line((289.358409428, -41.146722824), (308.358409428, -41.146722824))
            Line((308.358409428, -41.146722824), (308.358409428, -26.146722824))
            ThreePointArc((308.358409428, -26.146722824), (298.858409428, -16.646722824), (289.358409428, -26.146722824))
        make_face()
        with Locations((298.858409428, -26.146722824)):
            Circle(SKETCH16_R, mode=Mode.SUBTRACT)
    extrude(amount=BOSS_EXTRUDE10_2_DEPTH, both=True)


solid = Compound([body_2_2_2.part, part_6.part, body_3_2.part, body_4.part, body_5.part])
